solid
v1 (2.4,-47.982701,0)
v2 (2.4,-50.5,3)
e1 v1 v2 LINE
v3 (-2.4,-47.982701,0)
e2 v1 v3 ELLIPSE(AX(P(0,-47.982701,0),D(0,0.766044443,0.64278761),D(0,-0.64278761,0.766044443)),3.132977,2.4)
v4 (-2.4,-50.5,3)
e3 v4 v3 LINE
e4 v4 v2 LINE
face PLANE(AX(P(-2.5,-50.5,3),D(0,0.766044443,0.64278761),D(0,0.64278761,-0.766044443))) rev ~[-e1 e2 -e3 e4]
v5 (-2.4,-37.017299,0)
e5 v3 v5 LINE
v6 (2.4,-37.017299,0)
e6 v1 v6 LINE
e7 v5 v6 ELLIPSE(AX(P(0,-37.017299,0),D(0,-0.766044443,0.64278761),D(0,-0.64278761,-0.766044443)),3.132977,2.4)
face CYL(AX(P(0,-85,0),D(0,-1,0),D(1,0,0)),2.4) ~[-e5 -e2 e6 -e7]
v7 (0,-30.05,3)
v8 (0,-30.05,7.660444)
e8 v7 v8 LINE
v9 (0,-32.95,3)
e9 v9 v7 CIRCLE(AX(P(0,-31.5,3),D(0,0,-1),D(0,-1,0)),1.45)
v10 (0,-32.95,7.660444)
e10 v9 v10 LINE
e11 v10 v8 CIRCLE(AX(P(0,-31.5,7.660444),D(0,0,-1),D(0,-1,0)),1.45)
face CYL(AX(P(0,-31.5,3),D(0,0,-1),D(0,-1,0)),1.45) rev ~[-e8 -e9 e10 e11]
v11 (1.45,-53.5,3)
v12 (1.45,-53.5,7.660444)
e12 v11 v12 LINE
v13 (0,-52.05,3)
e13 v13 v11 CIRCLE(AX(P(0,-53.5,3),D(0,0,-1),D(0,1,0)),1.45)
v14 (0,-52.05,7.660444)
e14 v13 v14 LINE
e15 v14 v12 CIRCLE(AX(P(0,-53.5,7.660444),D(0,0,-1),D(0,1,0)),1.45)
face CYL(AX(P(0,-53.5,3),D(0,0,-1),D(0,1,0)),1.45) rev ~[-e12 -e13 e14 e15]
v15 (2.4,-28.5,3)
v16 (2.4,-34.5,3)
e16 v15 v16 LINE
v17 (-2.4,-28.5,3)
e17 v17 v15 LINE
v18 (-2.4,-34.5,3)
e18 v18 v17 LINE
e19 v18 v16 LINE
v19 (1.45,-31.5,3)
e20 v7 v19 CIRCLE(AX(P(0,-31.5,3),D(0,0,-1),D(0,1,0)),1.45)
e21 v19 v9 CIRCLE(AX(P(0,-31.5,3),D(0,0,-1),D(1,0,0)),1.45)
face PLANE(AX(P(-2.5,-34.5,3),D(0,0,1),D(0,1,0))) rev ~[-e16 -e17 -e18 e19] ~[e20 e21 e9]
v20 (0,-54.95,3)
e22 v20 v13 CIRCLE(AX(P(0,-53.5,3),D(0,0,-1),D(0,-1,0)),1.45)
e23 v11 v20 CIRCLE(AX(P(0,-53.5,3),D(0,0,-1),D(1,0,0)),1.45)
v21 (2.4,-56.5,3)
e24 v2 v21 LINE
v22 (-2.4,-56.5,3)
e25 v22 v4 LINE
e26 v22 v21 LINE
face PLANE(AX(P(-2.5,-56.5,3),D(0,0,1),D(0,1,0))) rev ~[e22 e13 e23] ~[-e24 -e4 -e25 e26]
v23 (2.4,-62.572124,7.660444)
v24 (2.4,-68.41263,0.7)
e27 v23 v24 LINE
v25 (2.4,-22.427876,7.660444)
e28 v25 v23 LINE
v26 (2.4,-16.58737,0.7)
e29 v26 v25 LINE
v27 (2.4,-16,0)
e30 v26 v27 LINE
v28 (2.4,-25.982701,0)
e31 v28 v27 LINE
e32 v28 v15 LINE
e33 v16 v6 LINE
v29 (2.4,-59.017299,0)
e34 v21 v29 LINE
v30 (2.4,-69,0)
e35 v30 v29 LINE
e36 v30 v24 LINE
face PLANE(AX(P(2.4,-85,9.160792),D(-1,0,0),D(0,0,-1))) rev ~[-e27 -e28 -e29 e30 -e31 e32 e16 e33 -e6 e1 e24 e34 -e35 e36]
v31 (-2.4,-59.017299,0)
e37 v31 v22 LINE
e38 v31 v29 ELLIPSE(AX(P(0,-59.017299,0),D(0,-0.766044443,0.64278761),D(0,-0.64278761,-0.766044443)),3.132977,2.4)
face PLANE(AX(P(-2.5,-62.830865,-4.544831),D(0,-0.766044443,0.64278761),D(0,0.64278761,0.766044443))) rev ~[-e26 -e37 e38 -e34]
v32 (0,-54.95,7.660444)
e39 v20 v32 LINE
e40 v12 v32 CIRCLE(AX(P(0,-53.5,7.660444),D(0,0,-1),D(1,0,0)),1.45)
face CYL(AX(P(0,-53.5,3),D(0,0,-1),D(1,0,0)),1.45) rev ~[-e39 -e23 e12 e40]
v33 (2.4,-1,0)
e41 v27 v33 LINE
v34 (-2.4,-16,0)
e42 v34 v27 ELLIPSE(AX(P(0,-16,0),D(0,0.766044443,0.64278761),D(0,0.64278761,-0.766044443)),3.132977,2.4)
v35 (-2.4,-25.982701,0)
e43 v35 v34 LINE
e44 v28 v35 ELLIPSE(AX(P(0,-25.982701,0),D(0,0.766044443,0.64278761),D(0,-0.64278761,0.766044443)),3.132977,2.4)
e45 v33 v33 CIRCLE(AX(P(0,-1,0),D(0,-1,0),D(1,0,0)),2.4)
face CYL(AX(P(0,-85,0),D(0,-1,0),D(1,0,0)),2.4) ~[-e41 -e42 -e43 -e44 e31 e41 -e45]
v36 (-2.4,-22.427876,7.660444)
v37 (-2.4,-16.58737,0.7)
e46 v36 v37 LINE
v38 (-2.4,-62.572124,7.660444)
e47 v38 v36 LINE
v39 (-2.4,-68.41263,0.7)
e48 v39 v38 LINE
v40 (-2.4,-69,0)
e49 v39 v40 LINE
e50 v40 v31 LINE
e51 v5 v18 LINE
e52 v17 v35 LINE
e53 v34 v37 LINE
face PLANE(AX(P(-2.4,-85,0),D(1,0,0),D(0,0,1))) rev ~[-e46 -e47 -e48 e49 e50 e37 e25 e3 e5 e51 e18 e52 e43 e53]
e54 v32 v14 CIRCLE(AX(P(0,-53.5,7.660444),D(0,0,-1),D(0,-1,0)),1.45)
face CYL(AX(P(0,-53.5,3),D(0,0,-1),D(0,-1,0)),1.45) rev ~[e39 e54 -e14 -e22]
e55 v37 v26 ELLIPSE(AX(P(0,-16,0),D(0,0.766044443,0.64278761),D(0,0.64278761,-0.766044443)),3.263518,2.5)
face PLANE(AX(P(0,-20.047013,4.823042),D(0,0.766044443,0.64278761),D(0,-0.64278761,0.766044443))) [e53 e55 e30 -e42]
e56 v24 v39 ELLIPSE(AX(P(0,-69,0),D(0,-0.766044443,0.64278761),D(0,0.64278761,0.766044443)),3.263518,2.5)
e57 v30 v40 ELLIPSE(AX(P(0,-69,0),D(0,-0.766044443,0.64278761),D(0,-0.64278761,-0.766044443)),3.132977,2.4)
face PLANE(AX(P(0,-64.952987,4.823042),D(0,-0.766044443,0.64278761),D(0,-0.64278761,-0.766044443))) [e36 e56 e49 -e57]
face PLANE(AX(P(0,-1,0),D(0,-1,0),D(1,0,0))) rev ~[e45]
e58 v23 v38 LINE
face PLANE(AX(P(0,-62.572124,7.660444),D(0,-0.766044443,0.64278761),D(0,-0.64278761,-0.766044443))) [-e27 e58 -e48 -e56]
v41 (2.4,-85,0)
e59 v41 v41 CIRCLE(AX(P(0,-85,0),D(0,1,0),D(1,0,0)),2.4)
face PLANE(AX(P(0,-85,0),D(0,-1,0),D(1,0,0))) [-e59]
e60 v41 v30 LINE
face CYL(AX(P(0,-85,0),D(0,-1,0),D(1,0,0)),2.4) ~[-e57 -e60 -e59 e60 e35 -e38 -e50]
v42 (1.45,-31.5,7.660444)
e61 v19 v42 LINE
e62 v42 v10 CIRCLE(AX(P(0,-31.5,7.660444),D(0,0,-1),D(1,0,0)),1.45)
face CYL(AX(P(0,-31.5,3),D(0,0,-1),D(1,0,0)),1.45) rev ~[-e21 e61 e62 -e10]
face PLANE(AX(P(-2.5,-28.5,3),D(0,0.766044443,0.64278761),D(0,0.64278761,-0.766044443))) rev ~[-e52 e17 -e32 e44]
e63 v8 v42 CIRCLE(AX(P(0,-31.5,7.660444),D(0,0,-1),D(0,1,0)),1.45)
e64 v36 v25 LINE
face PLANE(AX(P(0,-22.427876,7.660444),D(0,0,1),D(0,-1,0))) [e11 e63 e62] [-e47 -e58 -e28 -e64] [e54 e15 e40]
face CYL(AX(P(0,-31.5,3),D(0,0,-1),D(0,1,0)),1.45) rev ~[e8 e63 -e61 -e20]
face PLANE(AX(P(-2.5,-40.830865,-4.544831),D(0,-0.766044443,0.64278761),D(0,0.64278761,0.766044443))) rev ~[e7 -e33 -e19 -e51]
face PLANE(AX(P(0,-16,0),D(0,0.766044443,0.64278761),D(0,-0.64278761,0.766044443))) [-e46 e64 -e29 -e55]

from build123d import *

# Parameters (mm, degrees)
F0_R      = 2.5
F1_DEPTH  = 85
F3_DEPTH  = 2.5
F5_DEPTH  = 25
F8_DEPTH  = 25
F9_DEPTH  = 25
F11_DEPTH = 25
F14_DEPTH = 102
F16_REACH = 96.5783545855
F18_REACH = 97.7333268634
F19_DEPTH = 1


with BuildPart() as f1:
    # F0 (on Front) → F1 (new body)
    with BuildSketch(Plane.XZ):
        Circle(F0_R)
    extrude(amount=F1_DEPTH)

    # F2 (on Right) → F3 (join, symmetric)
    with BuildSketch(Plane.YZ):
        Polygon((-69, 0), (-16, 0), (-22.4278760969, 7.6604444312), (-62.5721239031, 7.6604444312), align=None)
    extrude(amount=F3_DEPTH, both=True)

    # F4 (on face) → F5 (cut)
    with BuildSketch(Plane(origin=(-2.5, 0, 0), x_dir=(0, -1, 0), z_dir=(-1, 0, 0))):
        Polygon((56.5, 3), (53.5, 3), (50.5, 3), (44.1691353238, -4.5448307221), (62.8308646762, -4.5448307221), align=None)
        Polygon((40.8308646762, -4.5448307221), (34.5, 3), (31.5, 3), (28.5, 3), (22.1691353238, -4.5448307221), align=None)
    extrude(amount=-F5_DEPTH, mode=Mode.SUBTRACT)

    # F7 (on face) → F8 (cut)
    with BuildSketch(Plane(origin=(-2.5, 0, 0), x_dir=(0, -1, 0), z_dir=(-1, 0, 0))):
        Polygon((19.9172031134, 7.5), (22.2932472338, 7.5), (22.4278760969, 7.6604444312), (62.5721239031, 7.6604444312), (62.7067527662, 7.5), (66.5233954787, 7.5), (66.5233954787, 10.3880958632), (19.9172031134, 10.3880958632), align=None)
    extrude(amount=-F8_DEPTH, mode=Mode.SUBTRACT)

    # F6 (on face) → F9 (cut)
    with BuildSketch(Plane(origin=(0, 0, 3), x_dir=(1, 0, 0), z_dir=(0, 0, -1))):
        with BuildLine():
            ThreePointArc((1.45, 53.5), (1.0253048327, 54.5253048327), (0, 54.95))
            Line((0, 54.95), (0, 52.05))
            ThreePointArc((0, 52.05), (1.0253048327, 52.4746951673), (1.45, 53.5))
        make_face()
        with BuildLine():
            Line((0, 52.05), (0, 54.95))
            ThreePointArc((0, 54.95), (-1.45, 53.5), (0, 52.05))
        make_face()
    extrude(amount=-F9_DEPTH, mode=Mode.SUBTRACT)

    # F10 (on face) → F11 (cut)
    with BuildSketch(Plane(origin=(0, 0, 3), x_dir=(1, 0, 0), z_dir=(0, 0, -1))):
        with BuildLine():
            ThreePointArc((1.45, 31.5), (1.0253048327, 32.5253048327), (0, 32.95))
            Line((0, 32.95), (0, 30.05))
            ThreePointArc((0, 30.05), (1.0253048327, 30.4746951673), (1.45, 31.5))
        make_face()
        with BuildLine():
            Line((0, 30.05), (0, 32.95))
            ThreePointArc((0, 32.95), (-1.45, 31.5), (0, 30.05))
        make_face()
    extrude(amount=-F11_DEPTH, mode=Mode.SUBTRACT)

    # F13 (on face) → F14 (cut)
    with BuildSketch(Plane.XZ.offset(85)):
        with BuildLine():
            ThreePointArc((2.4, 0), (0, -2.4), (-2.4, 0))
            Line((-2.4, 0), (-2.4, 9.7710704431))
            Line((-2.4, 9.7710704431), (-6.1972029507, 9.7710704431))
            Line((-6.1972029507, 9.7710704431), (-6.1972029507, -5.7614380494))
            Line((-6.1972029507, -5.7614380494), (5.5722752586, -5.7614380494))
            Line((5.5722752586, -5.7614380494), (5.5722752586, 8.8547384366))
            Line((5.5722752586, 8.8547384366), (2.4, 9.1607915238))
            Line((2.4, 9.1607915238), (2.4, 0))
        make_face()
    extrude(amount=-F14_DEPTH, mode=Mode.SUBTRACT)

    f16_end = Plane(origin=(0, -64.9529870595, 4.8230422111), x_dir=(0, -0.6427876097, -0.7660444431), z_dir=(0, -0.7660444431, 0.6427876097))
    # F15 (on face) → F16 (cut, up to a plane its end follows)
    with BuildSketch(Plane.XZ.offset(85)):
        with BuildLine():
            ThreePointArc((-2.4, 0), (0, 2.4), (2.4, 0))
            Line((2.4, 0), (4.8319334164, 0))
            Line((4.8319334164, 0), (4.1808704846, 8.0774491653))
            Line((4.1808704846, 8.0774491653), (-2.9383567162, 8.0774491653))
            Line((-2.9383567162, 8.0774491653), (-3.4620375372, 0))
            Line((-3.4620375372, 0), (-2.4, 0))
        make_face()
    f16_long = extrude(amount=-F16_REACH, mode=Mode.PRIVATE)
    add(split(f16_long, bisect_by=f16_end, keep=Keep.TOP, mode=Mode.PRIVATE), mode=Mode.SUBTRACT)

    f18_end = Plane(origin=(0, -20.0470129405, 4.8230422111), x_dir=(0, -0.6427876097, 0.7660444431), z_dir=(0, 0.7660444431, 0.6427876097))
    # F17 (on face) → F18 (cut, up to a plane its end follows)
    with BuildSketch(Plane(origin=(0, 0, 0), x_dir=(-1, 0, 0), z_dir=(0, 1, 0))):
        with BuildLine():
            ThreePointArc((-2.4, 0), (0, 2.4), (2.4, 0))
            Line((2.4, 0), (3.9089121856, 0))
            Line((3.9089121856, 0), (4.3247276917, 8.6870230734))
            Line((4.3247276917, 8.6870230734), (-4.9837511033, 8.3660408854))
            Line((-4.9837511033, 8.3660408854), (-3.4170385916, 0))
            Line((-3.4170385916, 0), (-2.4, 0))
        make_face()
    f18_long = extrude(amount=-F18_REACH, mode=Mode.PRIVATE)
    add(split(f18_long, bisect_by=f18_end, keep=Keep.TOP, mode=Mode.PRIVATE), mode=Mode.SUBTRACT)

    # F19 (cut): a face of the model
    f19_faces = [f1.faces().sort_by_distance(p)[0] for p in [
        (0, 0, 0),
    ]]
    extrude(f19_faces, amount=-F19_DEPTH, mode=Mode.SUBTRACT)


solid = f1.part
